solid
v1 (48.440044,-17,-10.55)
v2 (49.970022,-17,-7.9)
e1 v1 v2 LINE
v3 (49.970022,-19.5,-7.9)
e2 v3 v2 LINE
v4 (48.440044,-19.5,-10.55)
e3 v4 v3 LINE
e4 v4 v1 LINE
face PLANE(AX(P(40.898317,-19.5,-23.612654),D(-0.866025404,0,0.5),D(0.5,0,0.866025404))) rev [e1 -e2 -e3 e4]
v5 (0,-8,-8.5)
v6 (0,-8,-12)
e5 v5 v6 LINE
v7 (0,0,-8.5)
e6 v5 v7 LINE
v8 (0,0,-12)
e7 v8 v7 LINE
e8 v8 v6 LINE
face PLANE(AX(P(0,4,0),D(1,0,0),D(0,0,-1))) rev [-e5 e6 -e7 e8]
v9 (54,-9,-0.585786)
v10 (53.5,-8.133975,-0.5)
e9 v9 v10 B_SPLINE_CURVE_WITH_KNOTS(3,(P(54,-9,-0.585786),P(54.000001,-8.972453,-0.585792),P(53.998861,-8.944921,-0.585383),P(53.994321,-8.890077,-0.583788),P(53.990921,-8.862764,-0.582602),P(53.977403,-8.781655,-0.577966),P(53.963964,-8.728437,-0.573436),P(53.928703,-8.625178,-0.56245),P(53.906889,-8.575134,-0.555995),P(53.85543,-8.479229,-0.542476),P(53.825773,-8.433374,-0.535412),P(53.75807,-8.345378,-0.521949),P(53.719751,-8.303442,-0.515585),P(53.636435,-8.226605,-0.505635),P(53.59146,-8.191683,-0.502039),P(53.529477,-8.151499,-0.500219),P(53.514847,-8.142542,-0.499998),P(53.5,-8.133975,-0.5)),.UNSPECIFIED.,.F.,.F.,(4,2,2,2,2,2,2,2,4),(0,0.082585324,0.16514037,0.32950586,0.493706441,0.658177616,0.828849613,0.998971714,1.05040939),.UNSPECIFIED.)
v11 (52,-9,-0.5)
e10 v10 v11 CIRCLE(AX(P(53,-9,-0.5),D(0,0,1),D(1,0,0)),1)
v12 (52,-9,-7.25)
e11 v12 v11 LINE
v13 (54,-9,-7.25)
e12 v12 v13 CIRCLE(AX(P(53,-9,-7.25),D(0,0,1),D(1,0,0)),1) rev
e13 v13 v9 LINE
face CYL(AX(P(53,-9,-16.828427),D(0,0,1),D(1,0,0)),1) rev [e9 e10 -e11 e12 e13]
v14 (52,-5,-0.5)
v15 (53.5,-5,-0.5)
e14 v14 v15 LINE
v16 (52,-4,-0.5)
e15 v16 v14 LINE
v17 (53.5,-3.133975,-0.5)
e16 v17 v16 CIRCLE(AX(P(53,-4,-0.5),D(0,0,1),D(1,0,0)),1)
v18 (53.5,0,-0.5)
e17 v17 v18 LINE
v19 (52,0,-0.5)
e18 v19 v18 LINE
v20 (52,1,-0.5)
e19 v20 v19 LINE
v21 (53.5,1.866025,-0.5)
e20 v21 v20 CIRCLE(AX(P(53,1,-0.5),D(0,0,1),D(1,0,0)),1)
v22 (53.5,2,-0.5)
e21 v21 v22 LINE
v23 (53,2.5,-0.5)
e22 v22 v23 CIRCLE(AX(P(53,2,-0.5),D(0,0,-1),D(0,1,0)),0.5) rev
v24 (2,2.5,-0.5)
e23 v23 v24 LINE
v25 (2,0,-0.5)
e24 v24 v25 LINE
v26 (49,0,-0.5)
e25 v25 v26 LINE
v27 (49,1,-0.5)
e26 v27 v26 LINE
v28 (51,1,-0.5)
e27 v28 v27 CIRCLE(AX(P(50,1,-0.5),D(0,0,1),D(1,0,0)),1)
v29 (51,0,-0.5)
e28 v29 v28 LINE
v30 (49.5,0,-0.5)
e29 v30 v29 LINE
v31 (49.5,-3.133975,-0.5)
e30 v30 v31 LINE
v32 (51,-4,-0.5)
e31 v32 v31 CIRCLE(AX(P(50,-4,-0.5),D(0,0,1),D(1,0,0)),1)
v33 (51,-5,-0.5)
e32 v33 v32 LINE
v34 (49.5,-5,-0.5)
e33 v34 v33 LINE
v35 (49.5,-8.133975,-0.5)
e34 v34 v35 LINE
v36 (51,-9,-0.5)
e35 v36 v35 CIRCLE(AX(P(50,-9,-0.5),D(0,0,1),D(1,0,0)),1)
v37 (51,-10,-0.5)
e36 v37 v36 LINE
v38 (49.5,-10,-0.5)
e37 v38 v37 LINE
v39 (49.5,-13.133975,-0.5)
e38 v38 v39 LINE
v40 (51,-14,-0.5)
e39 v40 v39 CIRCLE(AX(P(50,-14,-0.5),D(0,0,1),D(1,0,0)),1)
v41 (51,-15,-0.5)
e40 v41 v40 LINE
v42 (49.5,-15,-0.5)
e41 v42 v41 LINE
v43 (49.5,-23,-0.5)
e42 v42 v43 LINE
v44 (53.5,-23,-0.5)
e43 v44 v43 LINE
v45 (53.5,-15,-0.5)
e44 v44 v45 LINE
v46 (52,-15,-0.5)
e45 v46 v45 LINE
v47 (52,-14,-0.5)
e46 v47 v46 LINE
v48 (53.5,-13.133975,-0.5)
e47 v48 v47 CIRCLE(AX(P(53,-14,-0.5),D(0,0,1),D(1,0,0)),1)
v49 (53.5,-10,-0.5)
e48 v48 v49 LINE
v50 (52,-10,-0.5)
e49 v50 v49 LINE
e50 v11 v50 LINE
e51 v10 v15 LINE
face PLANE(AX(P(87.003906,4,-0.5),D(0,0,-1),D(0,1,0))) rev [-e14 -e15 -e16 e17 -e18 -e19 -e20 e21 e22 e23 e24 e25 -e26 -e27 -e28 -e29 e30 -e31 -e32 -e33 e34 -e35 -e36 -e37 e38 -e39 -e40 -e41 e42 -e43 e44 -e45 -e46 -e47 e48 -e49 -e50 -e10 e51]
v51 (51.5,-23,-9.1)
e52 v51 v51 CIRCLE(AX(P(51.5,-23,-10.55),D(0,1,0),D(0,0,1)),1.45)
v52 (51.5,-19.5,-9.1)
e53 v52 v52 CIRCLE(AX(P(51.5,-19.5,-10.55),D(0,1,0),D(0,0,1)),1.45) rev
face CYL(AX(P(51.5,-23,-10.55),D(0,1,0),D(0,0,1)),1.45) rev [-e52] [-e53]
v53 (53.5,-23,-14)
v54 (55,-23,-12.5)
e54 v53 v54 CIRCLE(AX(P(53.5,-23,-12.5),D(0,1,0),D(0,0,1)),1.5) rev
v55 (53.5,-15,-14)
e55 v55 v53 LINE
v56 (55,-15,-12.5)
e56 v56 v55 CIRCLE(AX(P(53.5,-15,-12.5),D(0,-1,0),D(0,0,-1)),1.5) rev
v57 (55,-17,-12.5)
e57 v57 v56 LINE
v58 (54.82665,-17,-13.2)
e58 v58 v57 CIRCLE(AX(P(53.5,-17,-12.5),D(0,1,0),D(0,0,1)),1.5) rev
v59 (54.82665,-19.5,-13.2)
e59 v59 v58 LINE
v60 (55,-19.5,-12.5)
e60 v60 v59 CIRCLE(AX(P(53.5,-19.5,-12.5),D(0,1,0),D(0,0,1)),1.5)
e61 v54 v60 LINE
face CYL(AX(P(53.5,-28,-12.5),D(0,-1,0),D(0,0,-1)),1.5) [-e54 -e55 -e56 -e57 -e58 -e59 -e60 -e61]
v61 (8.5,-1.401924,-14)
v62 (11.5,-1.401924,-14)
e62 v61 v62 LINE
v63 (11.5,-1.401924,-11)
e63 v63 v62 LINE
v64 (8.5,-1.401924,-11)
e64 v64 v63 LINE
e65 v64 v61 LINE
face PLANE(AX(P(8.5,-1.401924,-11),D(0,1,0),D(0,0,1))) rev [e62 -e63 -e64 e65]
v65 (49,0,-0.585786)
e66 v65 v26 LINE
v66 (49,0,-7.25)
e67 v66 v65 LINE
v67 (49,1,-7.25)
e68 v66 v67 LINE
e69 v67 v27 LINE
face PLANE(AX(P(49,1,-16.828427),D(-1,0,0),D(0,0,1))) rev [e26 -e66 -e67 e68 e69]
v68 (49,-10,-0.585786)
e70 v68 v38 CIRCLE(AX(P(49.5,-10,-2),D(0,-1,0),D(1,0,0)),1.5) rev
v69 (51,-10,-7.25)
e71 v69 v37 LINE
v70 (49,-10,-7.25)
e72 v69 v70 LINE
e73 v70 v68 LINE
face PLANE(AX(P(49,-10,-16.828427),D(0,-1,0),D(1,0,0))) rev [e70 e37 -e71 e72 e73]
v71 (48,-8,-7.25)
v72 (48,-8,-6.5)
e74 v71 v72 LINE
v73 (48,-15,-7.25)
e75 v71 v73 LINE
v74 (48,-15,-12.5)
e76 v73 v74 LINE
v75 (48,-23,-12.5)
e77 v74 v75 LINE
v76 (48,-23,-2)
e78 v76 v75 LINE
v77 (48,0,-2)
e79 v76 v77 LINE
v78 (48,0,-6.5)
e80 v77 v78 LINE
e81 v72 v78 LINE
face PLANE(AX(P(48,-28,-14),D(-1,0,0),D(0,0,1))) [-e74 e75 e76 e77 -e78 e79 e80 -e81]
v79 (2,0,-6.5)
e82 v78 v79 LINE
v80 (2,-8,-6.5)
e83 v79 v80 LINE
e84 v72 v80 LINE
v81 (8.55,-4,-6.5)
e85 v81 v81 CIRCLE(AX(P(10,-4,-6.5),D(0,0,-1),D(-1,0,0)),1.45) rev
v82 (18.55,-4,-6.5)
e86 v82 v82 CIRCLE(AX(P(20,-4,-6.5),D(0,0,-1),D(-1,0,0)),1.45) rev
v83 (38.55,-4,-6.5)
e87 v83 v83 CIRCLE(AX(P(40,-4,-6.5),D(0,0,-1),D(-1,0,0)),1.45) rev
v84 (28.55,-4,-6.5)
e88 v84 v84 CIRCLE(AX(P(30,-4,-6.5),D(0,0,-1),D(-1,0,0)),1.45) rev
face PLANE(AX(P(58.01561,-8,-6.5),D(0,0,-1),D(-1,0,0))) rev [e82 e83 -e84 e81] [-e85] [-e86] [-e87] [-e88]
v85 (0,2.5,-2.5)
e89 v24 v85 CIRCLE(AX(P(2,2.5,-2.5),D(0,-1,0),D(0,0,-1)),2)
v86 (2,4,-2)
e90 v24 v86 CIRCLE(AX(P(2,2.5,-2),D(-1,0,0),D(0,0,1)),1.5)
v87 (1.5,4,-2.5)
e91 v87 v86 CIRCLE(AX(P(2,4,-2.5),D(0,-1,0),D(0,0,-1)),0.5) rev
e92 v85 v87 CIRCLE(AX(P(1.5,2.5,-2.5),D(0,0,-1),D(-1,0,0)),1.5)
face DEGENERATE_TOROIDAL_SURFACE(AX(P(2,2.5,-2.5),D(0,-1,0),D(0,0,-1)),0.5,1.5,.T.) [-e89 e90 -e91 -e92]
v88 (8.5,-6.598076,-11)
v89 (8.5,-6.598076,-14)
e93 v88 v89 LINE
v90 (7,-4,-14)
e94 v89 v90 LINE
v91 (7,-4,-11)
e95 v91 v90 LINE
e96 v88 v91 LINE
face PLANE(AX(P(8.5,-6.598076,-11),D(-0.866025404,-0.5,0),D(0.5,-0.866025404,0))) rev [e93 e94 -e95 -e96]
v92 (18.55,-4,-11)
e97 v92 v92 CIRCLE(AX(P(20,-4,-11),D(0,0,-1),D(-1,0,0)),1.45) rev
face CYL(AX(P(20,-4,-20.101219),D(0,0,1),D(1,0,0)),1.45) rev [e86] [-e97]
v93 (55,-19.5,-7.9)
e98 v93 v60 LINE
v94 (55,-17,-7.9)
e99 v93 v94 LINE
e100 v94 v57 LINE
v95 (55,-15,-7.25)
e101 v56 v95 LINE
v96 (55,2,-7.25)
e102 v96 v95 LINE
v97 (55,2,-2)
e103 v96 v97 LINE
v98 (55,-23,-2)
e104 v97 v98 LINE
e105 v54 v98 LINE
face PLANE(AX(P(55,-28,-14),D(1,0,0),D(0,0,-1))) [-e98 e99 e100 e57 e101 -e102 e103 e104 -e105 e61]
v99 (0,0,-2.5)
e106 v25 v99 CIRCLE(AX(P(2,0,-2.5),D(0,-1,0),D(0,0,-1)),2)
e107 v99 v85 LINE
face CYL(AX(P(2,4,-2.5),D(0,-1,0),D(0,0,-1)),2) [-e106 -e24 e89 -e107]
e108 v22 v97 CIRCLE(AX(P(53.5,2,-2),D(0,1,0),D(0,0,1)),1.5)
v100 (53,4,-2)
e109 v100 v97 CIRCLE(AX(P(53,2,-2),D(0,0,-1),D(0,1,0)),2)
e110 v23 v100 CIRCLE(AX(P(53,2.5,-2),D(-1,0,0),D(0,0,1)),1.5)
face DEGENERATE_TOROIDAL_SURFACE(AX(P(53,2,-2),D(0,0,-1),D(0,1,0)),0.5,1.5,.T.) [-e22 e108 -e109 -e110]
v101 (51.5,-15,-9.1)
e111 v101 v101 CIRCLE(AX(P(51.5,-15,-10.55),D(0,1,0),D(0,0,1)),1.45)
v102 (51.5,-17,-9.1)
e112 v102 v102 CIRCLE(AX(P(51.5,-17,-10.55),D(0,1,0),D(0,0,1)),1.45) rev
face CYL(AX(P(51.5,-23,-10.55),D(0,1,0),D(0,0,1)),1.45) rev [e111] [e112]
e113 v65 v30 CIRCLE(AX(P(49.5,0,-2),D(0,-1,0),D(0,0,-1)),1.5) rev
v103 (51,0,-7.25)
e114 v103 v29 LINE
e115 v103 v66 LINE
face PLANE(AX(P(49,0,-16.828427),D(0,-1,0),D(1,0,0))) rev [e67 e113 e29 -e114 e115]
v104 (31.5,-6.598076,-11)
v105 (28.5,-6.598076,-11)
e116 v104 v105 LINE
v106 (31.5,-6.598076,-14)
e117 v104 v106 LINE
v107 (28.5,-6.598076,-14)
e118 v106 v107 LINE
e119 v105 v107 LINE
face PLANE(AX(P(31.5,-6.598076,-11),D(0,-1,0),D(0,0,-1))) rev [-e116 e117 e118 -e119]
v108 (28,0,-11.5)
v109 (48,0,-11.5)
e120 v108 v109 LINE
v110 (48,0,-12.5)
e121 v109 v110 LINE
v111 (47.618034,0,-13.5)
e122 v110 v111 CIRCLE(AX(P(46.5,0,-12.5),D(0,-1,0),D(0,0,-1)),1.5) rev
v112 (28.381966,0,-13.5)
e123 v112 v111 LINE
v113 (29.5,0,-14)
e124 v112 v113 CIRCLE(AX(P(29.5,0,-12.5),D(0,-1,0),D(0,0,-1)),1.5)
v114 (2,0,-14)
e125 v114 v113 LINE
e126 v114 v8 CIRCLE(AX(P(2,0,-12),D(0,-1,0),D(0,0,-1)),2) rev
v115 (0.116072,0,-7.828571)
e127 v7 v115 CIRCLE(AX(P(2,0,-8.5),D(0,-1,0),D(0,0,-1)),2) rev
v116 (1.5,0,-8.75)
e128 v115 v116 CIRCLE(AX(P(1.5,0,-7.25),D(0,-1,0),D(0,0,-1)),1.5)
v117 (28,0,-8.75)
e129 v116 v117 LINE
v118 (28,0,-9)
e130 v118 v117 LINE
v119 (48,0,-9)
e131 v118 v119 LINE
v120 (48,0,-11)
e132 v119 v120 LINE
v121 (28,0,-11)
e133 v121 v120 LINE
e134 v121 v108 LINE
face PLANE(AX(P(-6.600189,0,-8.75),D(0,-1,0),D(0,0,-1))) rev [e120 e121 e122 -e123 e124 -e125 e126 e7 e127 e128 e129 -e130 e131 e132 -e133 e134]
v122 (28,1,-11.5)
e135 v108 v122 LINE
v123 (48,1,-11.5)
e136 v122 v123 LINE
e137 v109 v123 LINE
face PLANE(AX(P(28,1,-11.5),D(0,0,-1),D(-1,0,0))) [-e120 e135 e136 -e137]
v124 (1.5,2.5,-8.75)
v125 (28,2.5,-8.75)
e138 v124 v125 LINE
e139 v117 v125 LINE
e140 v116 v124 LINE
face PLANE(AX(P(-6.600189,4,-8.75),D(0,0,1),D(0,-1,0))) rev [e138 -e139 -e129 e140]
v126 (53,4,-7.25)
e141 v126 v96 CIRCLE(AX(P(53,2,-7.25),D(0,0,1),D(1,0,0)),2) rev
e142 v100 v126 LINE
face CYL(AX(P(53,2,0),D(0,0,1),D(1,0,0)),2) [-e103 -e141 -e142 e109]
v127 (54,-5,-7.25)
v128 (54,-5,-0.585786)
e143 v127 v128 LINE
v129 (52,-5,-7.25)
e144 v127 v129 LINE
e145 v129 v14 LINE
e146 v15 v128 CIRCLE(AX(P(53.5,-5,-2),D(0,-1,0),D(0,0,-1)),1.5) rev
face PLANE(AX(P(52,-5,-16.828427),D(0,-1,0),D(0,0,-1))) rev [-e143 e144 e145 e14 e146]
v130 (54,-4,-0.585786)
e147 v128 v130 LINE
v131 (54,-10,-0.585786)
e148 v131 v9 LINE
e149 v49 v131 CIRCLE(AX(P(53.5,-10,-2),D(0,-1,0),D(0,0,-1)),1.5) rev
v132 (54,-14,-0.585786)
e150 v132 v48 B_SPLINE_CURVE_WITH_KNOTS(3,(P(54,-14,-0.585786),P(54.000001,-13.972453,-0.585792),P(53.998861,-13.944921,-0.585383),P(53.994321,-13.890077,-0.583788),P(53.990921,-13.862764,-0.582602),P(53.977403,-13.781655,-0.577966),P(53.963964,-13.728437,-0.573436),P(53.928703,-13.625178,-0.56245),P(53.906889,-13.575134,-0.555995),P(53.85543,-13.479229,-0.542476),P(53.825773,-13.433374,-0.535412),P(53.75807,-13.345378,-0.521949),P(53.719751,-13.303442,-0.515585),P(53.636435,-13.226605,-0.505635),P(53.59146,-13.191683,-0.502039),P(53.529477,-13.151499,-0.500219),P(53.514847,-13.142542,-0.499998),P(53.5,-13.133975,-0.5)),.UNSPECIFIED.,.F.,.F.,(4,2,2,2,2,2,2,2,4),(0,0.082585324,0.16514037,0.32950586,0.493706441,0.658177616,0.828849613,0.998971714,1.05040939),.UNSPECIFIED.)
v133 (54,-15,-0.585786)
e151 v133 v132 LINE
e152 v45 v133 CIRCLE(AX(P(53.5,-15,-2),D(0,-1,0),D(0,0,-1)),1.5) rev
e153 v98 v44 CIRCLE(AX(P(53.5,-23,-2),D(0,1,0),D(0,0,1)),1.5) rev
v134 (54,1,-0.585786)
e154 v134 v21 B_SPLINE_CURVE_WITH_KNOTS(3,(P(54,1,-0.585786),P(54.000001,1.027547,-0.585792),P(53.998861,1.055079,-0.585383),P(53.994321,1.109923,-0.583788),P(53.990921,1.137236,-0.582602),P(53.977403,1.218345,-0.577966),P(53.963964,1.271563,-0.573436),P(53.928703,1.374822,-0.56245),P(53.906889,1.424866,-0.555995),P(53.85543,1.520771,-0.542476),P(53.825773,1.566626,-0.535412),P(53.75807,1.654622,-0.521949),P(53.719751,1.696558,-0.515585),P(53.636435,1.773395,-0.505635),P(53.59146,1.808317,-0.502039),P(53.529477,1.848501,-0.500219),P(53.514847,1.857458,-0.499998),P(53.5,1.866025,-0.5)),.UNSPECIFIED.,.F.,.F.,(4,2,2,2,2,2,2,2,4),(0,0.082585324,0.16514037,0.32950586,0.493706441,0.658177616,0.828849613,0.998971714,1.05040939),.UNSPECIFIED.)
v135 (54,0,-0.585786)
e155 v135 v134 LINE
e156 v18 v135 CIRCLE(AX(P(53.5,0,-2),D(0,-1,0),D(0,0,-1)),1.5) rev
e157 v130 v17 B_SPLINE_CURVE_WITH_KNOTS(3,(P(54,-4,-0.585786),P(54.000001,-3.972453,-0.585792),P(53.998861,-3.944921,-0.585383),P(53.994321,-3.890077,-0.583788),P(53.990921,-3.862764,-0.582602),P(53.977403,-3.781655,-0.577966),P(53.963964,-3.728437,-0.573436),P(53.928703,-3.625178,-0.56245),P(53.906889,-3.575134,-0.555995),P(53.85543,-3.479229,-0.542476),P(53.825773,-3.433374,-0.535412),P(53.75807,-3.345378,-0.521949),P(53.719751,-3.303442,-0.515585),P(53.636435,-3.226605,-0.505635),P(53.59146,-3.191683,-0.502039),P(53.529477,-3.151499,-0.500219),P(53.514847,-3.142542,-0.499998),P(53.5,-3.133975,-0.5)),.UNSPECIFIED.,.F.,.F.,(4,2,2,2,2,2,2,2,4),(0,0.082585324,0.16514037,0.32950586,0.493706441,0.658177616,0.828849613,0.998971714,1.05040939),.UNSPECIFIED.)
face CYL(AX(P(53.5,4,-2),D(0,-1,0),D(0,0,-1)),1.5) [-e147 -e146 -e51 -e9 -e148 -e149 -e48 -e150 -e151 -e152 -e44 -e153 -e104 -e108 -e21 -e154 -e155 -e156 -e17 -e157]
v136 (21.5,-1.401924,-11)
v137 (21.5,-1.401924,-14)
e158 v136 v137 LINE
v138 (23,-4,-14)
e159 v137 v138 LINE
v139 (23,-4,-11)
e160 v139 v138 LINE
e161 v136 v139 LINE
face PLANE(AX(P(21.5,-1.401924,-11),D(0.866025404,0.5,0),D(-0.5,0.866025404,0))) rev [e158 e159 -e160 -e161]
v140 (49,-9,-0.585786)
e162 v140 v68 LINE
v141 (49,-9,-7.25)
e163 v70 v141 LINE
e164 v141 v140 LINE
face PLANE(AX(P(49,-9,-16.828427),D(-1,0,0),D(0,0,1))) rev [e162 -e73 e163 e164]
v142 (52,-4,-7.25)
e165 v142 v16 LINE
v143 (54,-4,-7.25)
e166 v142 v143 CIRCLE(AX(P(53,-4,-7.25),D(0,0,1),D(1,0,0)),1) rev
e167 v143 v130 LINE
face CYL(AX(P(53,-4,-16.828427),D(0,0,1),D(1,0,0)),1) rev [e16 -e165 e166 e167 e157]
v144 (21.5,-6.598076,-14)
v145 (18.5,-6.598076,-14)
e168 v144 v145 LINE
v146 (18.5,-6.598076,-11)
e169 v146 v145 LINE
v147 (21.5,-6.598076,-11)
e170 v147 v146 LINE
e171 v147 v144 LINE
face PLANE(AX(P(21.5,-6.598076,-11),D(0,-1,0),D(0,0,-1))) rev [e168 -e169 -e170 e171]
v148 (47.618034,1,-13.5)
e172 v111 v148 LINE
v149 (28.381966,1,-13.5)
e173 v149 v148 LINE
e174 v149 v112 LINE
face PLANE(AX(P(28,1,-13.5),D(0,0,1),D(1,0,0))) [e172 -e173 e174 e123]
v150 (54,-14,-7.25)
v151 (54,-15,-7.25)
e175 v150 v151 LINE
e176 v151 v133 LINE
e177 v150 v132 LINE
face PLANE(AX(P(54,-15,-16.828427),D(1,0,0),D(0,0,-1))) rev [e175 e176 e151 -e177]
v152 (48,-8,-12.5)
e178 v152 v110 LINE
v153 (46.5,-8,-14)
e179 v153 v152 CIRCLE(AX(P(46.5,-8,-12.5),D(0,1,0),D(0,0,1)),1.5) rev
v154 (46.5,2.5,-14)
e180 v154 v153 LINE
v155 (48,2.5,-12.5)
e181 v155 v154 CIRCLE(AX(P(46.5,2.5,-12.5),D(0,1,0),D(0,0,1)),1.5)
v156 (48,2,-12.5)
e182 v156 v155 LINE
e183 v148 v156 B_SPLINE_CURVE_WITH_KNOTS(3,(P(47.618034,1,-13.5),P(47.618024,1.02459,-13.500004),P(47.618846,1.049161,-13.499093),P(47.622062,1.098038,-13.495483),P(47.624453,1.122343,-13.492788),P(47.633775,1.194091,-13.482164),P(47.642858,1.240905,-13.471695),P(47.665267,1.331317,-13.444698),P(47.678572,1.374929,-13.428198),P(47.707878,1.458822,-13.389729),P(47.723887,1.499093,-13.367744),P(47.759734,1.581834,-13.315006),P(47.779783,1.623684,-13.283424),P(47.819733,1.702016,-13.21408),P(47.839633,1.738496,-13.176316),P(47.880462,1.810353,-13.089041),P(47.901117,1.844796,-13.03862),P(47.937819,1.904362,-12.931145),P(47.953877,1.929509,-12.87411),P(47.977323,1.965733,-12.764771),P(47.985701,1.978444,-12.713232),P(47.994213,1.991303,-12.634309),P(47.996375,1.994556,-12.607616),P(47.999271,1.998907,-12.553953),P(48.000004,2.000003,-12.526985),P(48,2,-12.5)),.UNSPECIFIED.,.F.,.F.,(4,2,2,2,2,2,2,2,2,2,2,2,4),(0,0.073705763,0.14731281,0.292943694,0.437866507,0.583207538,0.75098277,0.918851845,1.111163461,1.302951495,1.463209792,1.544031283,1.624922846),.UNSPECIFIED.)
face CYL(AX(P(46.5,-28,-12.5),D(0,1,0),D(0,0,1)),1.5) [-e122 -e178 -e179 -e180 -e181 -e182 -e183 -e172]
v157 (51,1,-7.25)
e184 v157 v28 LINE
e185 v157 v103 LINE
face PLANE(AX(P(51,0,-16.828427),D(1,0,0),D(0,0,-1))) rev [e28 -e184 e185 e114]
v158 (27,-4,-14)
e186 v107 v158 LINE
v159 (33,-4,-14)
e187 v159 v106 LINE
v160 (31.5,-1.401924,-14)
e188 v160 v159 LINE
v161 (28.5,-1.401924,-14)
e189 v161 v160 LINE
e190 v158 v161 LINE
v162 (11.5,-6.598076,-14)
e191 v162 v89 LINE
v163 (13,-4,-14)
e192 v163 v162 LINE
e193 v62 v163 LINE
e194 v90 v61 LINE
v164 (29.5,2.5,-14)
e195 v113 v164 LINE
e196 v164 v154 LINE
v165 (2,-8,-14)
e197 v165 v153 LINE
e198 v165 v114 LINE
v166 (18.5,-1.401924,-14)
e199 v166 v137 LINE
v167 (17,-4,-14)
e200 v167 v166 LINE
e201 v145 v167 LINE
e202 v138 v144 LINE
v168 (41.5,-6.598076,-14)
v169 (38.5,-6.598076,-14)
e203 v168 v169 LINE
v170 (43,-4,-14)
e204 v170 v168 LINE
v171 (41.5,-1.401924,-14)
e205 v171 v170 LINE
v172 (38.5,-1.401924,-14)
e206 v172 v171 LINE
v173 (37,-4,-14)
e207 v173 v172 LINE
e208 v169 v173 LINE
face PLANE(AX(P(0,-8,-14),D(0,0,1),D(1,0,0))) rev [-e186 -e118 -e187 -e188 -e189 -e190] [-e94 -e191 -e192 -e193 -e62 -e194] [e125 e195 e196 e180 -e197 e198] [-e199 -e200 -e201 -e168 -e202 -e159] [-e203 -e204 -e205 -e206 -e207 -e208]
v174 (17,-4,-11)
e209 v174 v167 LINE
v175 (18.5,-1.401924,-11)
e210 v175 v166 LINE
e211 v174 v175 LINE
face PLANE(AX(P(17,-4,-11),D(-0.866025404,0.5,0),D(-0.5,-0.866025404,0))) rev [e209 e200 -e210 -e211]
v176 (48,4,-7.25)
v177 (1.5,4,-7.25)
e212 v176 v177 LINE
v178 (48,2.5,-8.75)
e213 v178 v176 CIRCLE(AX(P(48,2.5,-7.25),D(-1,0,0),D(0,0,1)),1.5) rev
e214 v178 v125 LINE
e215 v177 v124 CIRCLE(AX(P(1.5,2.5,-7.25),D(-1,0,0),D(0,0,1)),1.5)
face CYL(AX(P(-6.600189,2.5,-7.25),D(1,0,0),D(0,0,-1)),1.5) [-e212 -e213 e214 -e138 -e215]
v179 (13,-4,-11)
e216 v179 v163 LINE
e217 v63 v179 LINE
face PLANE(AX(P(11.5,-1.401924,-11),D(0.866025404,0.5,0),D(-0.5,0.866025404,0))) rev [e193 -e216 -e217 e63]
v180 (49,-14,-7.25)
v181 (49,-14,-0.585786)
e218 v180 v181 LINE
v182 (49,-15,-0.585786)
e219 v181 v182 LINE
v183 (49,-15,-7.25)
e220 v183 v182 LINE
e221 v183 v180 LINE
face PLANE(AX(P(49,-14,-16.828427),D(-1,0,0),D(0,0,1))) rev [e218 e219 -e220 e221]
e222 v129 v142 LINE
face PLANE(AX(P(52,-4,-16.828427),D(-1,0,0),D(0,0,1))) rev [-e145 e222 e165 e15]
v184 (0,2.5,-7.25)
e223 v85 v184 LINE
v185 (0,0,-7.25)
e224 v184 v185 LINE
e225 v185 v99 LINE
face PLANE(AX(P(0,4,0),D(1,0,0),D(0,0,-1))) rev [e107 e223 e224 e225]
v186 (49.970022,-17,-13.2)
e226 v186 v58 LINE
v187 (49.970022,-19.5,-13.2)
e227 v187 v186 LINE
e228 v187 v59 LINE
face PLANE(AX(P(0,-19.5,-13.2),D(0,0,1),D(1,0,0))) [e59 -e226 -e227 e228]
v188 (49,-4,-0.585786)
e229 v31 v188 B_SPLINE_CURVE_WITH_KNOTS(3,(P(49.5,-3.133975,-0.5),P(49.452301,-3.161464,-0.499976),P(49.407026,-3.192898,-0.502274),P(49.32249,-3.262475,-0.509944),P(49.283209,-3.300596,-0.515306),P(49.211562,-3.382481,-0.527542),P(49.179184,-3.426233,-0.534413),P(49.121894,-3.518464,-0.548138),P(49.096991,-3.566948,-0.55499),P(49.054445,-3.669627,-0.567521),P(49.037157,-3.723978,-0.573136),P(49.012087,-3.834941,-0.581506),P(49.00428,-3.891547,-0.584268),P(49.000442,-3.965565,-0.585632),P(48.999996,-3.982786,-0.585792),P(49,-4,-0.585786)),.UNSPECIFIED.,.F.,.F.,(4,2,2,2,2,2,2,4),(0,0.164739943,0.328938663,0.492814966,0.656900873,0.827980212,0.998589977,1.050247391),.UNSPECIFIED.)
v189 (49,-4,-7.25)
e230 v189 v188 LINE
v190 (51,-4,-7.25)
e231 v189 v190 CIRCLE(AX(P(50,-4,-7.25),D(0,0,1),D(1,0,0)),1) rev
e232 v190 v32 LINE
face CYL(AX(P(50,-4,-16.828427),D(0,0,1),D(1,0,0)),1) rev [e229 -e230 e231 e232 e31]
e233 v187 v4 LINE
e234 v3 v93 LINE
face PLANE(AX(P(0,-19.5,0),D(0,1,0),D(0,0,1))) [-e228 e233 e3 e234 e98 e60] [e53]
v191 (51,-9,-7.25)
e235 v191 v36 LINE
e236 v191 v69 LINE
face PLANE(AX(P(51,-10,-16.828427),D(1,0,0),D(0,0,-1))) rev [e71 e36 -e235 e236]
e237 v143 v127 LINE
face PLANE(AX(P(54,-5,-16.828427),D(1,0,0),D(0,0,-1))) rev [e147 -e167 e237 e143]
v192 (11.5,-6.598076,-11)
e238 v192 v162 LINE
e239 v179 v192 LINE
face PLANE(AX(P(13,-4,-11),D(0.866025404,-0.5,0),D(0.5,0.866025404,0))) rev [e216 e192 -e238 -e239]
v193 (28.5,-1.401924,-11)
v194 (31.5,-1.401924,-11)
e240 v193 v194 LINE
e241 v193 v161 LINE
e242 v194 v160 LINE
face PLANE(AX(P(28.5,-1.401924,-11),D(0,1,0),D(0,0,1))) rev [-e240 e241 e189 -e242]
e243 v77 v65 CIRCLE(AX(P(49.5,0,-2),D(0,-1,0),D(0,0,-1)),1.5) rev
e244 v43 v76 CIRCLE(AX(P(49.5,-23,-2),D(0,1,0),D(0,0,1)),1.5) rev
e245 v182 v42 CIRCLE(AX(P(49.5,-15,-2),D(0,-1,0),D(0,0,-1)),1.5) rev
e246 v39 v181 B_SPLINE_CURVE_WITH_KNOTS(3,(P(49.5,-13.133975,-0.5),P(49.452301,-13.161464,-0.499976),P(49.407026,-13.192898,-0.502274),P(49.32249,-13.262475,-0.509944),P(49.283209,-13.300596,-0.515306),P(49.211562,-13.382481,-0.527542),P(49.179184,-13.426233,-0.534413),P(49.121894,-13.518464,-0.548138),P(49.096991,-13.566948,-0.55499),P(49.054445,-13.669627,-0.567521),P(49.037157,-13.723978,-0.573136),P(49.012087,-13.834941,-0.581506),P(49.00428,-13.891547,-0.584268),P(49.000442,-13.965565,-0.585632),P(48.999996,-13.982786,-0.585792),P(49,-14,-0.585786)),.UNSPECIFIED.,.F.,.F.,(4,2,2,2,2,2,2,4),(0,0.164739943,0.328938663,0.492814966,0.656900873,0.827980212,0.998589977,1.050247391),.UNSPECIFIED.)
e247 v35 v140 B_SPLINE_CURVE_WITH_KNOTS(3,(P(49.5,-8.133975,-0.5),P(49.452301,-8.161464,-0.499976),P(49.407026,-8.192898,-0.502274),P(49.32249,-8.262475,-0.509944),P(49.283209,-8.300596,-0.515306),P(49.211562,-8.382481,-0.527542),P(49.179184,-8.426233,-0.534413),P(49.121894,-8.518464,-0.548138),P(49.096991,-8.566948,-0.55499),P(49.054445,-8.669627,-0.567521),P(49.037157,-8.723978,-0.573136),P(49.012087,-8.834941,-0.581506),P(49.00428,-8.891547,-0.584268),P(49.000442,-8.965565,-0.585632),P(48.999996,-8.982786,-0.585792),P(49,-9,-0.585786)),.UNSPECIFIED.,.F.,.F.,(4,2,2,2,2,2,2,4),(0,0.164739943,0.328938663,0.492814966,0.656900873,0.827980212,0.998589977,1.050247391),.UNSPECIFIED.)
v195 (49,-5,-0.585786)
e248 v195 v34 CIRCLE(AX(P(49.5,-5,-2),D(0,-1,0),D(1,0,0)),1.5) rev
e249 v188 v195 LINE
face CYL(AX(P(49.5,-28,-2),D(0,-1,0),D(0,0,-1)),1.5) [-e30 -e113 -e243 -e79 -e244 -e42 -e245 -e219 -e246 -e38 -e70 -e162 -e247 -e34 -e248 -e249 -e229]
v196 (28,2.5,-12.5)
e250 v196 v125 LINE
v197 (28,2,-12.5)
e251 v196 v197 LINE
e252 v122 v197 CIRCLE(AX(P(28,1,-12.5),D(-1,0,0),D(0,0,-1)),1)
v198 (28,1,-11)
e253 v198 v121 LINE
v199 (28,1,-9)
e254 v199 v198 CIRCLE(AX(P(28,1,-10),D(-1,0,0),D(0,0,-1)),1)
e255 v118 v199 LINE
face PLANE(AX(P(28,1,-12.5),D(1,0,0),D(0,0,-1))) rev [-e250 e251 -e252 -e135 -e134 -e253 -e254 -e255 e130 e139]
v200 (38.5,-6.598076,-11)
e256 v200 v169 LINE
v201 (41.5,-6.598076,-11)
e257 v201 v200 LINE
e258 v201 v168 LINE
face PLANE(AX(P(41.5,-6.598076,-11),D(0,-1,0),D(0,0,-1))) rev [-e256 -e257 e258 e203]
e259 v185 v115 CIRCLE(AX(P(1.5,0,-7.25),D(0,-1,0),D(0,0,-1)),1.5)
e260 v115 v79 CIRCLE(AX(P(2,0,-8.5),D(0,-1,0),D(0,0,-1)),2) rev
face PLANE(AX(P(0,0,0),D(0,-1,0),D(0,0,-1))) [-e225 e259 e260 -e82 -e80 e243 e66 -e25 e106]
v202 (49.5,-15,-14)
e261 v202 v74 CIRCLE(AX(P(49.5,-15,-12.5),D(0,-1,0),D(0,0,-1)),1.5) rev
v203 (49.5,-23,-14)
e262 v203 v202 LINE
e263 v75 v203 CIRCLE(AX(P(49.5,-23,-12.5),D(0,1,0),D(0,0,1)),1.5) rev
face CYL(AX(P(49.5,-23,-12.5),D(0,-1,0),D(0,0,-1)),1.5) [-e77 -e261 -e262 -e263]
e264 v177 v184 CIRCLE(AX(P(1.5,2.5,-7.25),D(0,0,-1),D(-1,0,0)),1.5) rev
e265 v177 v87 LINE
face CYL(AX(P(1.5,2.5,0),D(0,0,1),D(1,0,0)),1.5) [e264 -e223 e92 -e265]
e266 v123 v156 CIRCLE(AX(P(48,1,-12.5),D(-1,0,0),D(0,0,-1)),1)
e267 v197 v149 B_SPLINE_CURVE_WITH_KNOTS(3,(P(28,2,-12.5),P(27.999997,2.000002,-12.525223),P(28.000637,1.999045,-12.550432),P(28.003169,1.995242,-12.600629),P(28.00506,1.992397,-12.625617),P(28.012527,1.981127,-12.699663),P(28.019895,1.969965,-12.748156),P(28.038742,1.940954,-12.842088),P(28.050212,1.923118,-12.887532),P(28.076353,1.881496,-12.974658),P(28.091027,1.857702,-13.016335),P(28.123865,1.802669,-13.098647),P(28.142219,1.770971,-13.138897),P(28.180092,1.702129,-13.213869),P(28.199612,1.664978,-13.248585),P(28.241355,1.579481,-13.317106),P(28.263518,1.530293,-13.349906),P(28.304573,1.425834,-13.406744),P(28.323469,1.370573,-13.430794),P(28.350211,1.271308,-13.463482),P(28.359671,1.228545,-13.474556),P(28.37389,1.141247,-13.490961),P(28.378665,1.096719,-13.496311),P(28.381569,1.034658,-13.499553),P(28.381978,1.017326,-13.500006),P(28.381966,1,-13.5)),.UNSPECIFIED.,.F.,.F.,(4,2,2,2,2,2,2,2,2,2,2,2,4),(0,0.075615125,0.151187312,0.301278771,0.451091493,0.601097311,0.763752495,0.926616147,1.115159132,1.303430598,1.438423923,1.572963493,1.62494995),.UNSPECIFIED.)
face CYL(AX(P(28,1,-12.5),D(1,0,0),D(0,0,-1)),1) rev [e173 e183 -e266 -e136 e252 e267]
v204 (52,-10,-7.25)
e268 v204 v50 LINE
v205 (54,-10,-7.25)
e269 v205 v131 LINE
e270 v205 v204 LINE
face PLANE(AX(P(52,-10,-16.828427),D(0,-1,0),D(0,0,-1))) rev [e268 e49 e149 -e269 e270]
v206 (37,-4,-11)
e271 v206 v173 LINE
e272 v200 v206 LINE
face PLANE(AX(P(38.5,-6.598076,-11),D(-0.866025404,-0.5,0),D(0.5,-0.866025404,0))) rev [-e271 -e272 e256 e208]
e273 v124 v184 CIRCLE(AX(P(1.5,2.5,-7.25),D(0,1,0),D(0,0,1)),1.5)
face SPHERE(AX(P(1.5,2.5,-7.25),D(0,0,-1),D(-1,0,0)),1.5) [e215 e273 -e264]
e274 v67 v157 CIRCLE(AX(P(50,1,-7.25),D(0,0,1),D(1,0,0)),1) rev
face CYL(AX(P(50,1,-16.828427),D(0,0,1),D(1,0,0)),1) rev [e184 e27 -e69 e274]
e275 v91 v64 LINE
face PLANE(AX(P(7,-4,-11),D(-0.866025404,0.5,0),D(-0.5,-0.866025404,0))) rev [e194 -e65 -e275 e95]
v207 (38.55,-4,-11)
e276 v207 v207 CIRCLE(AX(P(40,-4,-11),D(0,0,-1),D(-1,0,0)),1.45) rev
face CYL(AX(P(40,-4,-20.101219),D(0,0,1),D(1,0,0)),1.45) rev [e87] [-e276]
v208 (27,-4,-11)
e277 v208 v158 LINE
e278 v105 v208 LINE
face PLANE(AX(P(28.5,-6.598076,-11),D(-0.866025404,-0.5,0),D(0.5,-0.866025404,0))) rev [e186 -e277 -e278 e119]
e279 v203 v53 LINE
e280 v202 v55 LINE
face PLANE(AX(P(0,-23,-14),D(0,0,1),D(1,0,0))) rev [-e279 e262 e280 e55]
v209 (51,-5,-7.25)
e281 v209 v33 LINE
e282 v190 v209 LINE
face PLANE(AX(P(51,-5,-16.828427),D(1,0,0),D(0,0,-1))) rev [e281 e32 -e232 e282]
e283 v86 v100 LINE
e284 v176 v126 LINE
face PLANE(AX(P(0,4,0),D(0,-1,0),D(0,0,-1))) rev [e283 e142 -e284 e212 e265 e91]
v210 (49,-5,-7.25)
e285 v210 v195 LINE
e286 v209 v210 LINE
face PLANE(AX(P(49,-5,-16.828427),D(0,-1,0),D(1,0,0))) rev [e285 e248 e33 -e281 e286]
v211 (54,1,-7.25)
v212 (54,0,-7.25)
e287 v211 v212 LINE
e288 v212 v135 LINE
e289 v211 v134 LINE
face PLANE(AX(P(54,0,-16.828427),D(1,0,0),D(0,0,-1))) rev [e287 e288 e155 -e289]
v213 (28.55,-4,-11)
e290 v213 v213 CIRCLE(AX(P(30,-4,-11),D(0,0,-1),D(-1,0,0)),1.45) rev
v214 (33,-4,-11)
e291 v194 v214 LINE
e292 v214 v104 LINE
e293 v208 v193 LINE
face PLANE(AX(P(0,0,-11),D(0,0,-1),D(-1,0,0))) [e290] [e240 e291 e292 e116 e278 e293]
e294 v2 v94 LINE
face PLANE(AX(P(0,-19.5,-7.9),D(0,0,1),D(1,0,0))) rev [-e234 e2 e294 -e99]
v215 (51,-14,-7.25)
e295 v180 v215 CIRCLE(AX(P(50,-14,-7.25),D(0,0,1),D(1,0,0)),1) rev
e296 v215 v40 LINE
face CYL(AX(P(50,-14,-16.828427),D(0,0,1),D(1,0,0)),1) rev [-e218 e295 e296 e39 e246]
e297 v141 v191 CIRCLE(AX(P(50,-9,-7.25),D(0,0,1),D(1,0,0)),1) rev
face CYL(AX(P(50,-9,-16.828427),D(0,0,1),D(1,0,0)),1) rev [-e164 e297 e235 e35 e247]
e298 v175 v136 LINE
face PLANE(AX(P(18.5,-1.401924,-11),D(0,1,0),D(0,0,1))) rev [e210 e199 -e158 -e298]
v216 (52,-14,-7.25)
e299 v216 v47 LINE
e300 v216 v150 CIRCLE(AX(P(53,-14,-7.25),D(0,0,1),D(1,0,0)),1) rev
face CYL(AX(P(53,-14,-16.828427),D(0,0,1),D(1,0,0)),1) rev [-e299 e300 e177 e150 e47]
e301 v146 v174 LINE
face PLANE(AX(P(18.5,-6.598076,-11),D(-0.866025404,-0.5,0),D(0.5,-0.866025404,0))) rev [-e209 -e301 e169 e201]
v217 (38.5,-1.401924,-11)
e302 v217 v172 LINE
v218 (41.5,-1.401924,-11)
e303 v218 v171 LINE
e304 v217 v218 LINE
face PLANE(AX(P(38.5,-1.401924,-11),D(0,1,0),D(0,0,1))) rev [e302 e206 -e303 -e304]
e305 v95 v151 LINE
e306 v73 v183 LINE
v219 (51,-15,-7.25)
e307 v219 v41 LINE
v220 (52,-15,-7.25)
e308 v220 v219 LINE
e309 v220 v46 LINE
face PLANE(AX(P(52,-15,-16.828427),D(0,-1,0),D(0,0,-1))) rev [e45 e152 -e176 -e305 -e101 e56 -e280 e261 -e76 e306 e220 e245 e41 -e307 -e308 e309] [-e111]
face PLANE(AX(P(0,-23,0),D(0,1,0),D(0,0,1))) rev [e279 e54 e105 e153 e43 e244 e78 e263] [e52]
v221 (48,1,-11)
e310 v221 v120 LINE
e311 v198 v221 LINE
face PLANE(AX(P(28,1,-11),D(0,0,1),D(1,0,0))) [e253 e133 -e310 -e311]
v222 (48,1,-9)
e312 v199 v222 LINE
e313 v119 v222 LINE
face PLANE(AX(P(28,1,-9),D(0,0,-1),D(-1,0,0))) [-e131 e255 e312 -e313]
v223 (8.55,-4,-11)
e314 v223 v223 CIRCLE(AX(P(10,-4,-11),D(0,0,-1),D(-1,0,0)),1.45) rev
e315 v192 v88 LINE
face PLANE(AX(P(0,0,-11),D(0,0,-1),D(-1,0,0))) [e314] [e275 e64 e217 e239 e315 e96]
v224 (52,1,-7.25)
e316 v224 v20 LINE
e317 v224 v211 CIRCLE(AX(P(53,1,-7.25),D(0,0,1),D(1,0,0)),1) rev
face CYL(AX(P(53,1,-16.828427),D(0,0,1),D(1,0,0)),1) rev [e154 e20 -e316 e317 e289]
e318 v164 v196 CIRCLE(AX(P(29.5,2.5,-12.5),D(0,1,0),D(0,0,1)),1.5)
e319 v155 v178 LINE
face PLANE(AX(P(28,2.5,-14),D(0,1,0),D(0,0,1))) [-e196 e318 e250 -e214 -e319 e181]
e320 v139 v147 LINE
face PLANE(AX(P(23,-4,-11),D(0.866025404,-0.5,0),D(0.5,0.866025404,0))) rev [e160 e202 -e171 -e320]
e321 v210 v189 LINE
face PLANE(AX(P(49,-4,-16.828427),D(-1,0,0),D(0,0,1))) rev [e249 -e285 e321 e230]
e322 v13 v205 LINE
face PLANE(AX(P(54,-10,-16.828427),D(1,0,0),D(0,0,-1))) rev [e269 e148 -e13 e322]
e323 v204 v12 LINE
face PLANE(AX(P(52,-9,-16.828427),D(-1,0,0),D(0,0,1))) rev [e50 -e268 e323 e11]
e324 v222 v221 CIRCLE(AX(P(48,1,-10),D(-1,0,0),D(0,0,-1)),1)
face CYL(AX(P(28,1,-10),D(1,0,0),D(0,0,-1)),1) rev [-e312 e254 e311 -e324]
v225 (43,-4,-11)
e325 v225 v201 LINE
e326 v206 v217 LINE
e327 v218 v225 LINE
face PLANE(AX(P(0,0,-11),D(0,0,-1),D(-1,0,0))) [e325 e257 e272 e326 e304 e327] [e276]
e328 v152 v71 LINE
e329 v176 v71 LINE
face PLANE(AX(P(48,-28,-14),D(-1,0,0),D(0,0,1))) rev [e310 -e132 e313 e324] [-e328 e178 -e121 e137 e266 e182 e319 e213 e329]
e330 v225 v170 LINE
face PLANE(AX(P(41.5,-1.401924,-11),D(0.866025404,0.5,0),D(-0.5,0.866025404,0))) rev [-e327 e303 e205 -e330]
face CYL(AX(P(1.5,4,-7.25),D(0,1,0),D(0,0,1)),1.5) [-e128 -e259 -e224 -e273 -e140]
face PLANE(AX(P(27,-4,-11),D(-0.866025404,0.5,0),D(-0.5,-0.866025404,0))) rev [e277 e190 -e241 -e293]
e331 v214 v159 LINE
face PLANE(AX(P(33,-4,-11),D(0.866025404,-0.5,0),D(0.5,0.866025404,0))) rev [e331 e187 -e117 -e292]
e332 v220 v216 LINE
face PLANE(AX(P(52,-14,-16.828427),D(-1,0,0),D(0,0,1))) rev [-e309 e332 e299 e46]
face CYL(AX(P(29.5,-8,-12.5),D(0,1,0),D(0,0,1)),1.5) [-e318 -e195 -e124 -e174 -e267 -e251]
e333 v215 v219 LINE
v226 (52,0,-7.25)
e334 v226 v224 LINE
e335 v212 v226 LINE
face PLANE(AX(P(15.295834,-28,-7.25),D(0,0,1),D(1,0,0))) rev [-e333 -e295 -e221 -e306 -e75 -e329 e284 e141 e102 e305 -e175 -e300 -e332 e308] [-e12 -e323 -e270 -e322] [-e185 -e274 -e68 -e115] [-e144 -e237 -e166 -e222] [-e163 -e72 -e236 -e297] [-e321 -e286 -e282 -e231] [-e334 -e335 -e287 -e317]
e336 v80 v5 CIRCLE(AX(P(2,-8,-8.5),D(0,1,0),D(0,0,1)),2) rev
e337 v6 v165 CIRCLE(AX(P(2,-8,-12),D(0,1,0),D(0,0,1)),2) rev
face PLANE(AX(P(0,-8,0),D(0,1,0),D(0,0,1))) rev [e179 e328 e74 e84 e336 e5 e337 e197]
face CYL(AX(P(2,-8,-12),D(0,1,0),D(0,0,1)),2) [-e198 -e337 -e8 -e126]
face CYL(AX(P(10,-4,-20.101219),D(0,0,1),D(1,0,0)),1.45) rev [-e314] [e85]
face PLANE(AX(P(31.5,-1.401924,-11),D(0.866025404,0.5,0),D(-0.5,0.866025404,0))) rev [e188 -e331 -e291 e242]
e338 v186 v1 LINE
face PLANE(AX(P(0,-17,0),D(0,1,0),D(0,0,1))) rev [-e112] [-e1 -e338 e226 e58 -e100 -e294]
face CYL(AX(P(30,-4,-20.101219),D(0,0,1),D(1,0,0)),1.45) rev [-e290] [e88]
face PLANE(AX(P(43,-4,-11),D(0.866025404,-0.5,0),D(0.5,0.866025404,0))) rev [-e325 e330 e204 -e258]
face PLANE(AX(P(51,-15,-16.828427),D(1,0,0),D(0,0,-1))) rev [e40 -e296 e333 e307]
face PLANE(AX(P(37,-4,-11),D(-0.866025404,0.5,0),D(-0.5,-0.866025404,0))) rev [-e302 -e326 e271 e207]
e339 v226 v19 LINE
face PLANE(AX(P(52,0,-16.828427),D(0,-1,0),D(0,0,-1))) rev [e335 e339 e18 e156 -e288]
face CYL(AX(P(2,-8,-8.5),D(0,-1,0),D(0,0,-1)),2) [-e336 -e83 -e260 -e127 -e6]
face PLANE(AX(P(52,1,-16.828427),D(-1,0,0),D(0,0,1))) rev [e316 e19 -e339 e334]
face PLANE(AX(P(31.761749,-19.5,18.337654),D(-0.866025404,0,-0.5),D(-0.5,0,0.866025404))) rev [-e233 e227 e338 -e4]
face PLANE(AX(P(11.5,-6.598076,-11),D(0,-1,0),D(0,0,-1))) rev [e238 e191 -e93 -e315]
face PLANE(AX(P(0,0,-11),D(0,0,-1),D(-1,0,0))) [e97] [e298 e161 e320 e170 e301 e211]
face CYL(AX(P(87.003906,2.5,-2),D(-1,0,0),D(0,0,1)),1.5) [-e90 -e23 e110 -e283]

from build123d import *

# Parameters (mm, degrees)
SKETCH1_W            = 55
SKETCH1_H            = 16
BOSS_EXTRUDE1_DEPTH  = 4
SKETCH2_W            = 50
SKETCH2_H            = 8
BOSS_EXTRUDE2_DEPTH  = 8
SKETCH3_W            = 5
SKETCH3_H            = 16
BOSS_EXTRUDE3_DEPTH  = 28
SKETCH4_R            = 1.45
CUT_EXTRUDE2_DEPTH   = 10
CUT_EXTRUDE4_START   = -3
CUT_EXTRUDE4_DEPTH   = 3
CUT_EXTRUDE5_DEPTH   = 5
SKETCH8_W            = 50
SKETCH8_H            = 2
CUT_EXTRUDE6_DEPTH   = 4
CUT_EXTRUDE7_START   = -50
SKETCH9_W            = 0.5
SKETCH9_H            = 8
CUT_EXTRUDE7_DEPTH   = 50
CUT_EXTRUDE8_START   = -55
SKETCH10_W           = 0.5
SKETCH10_H           = 32
CUT_EXTRUDE8_DEPTH   = 55
CUT_EXTRUDE9_DEPTH   = 3
CUT_EXTRUDE11_DEPTH  = 3
BOSS_EXTRUDE4_START  = 2
SKETCH17_W           = 15
SKETCH17_H           = 32
BOSS_EXTRUDE4_DEPTH  = 2
SKETCH18_W           = 7
SKETCH18_H           = 1.5
CUT_EXTRUDE12_DEPTH  = 32
FILLET1_R            = 2
SKETCH19_W           = 13.5
SKETCH19_H           = 32
CUT_EXTRUDE13_DEPTH  = 7
SKETCH20_W           = 7
SKETCH20_H           = 13.5
BOSS_EXTRUDE5_DEPTH  = 32
CUT_EXTRUDE14_DEPTH  = 13.5
FILLET2_R            = 2
CUT_EXTRUDE15_REACH  = 65.285
SKETCH22_W           = 6.75
SKETCH22_H           = 32
LPATTERN1_COUNT      = 4
LPATTERN1_PITCH      = 5
SKETCH23_W           = 5.25
SKETCH23_H           = 4
CUT_EXTRUDE16_DEPTH  = 48
BOSS_EXTRUDE9_START  = -15
SKETCH29_W           = 7
SKETCH29_H           = 6.75
SKETCH29_R           = 1.45
BOSS_EXTRUDE9_DEPTH  = 8
CUT_EXTRUDE19_START  = -2
CUT_EXTRUDE19_DEPTH  = 2.5
BOSS_EXTRUDE11_DEPTH = 20
SKETCH35_W           = 7
SKETCH35_H           = 5
CUT_EXTRUDE20_DEPTH  = 6.75
FILLET3_R            = 1.5


# Read off the part's stored shape, not the designer's step: Cut-Extrude4
with BuildPart() as part:
    # Sketch1 → Boss-Extrude1 (new body)
    with BuildSketch(Plane(origin=(0, 0, 0), x_dir=(1, 0, 0), z_dir=(0, 1, 0))):
        with Locations((27.5, 8)):
            Rectangle(SKETCH1_W, SKETCH1_H)
    extrude(amount=BOSS_EXTRUDE1_DEPTH)

    # Sketch2 → Boss-Extrude2 (add)
    with BuildSketch(Plane.XZ):
        with Locations((25, -10)):
            Rectangle(SKETCH2_W, SKETCH2_H)
    extrude(amount=BOSS_EXTRUDE2_DEPTH)

    # Sketch3 → Boss-Extrude3 (add)
    with BuildSketch(Plane.XZ):
        with Locations((52.5, -8)):
            Rectangle(SKETCH3_W, SKETCH3_H)
    extrude(amount=BOSS_EXTRUDE3_DEPTH)

    # Sketch4 → Cut-Extrude2 (cut)
    with BuildSketch(Plane.XY.offset(-6)):
        with Locations((10, -4)):
            Circle(SKETCH4_R)
        with Locations((20, -4)):
            Circle(SKETCH4_R)
        with Locations((30, -4)):
            Circle(SKETCH4_R)
        with Locations((40, -4)):
            Circle(SKETCH4_R)
    extrude(amount=-CUT_EXTRUDE2_DEPTH, mode=Mode.SUBTRACT)

    # Cut-Extrude4 outline → Cut-Extrude4 (cut)
    with BuildSketch(Plane.ZY.offset(-50).offset(CUT_EXTRUDE4_START)):
        Polygon((-6.598076211, -25.5), (-4, -27), (-1.401923789, -25.5), (-1.401923789, 0), (-6, 0), (-6, -8), (-6.598076211, -8), align=None)
        Polygon((-7.401923789, -25.5), (-7.401923789, -8), (-12.598076211, -8), (-12.598076211, -25.5), (-10, -27), align=None)
    extrude(amount=CUT_EXTRUDE4_DEPTH, mode=Mode.SUBTRACT)

    # Sketch7 → Cut-Extrude5 (cut)
    with BuildSketch(Plane.ZY.offset(-50)):
        with BuildLine():
            Line((-11.45, -12), (-11.45, -24))
            ThreePointArc((-11.45, -24), (-10, -25.45), (-8.55, -24))
            Line((-8.55, -24), (-8.55, -12))
            ThreePointArc((-8.55, -12), (-10, -10.55), (-11.45, -12))
        make_face()
        with BuildLine():
            Line((-2.55, -12), (-2.55, -24))
            ThreePointArc((-2.55, -24), (-4, -25.45), (-5.45, -24))
            Line((-5.45, -24), (-5.45, -12))
            ThreePointArc((-5.45, -12), (-4, -10.55), (-2.55, -12))
        make_face()
    extrude(amount=-CUT_EXTRUDE5_DEPTH, mode=Mode.SUBTRACT)

    # Sketch8 → Cut-Extrude6 (cut)
    with BuildSketch(Plane(origin=(0, 4, 0), x_dir=(1, 0, 0), z_dir=(0, 1, 0))):
        with Locations((25, 15)):
            Rectangle(SKETCH8_W, SKETCH8_H)
    extrude(amount=-CUT_EXTRUDE6_DEPTH, mode=Mode.SUBTRACT)

    # Sketch9 → Cut-Extrude7 (cut)
    with BuildSketch(Plane.ZY.offset(CUT_EXTRUDE7_START)):
        with Locations((-6.25, -4)):
            Rectangle(SKETCH9_W, SKETCH9_H)
    extrude(amount=CUT_EXTRUDE7_DEPTH, mode=Mode.SUBTRACT)

    # Sketch10 → Cut-Extrude8 (cut)
    with BuildSketch(Plane.ZY.offset(CUT_EXTRUDE8_START)):
        with Locations((-0.25, -12)):
            Rectangle(SKETCH10_W, SKETCH10_H)
        with Locations((-15.75, -12)):
            Rectangle(SKETCH10_W, SKETCH10_H)
    extrude(amount=CUT_EXTRUDE8_DEPTH, mode=Mode.SUBTRACT)

    # Sketch11 → Cut-Extrude9 (cut)
    with BuildSketch(Plane(origin=(0, 0, -14), x_dir=(-1, 0, 0), z_dir=(0, 0, -1))):
        Polygon((-37, -4), (-38.5, -1.401923789), (-41.5, -1.401923789), (-43, -4), (-41.5, -6.598076211), (-38.5, -6.598076211), align=None)
        Polygon((-27, -4), (-28.5, -1.401923789), (-31.5, -1.401923789), (-33, -4), (-31.5, -6.598076211), (-28.5, -6.598076211), align=None)
        Polygon((-17, -4), (-18.5, -1.401923789), (-21.5, -1.401923789), (-23, -4), (-21.5, -6.598076211), (-18.5, -6.598076211), align=None)
        Polygon((-7, -4), (-8.5, -1.401923789), (-11.5, -1.401923789), (-13, -4), (-11.5, -6.598076211), (-8.5, -6.598076211), align=None)
    extrude(amount=-CUT_EXTRUDE9_DEPTH, mode=Mode.SUBTRACT)

    # Sketch15 → Cut-Extrude11 (cut)
    with BuildSketch(Plane.ZY.offset(-50)):
        Polygon((-4, -27), (-1.401923789, -25.5), (-1.401923789, 0.004821093), (-1.401923789, 4), (-6.598076211, 4), (-6.598076211, -8), (-6.598076211, -25.5), align=None)
        Polygon((-7.401923789, -25.5), (-7.401923789, -8), (-7.401923789, 4), (-12.598076211, 4), (-12.598076211, -8), (-12.598076211, -25.5), (-10, -27), align=None)
    extrude(amount=-CUT_EXTRUDE11_DEPTH, mode=Mode.SUBTRACT)

    # Sketch17 → Boss-Extrude4 (add)
    with BuildSketch(Plane.ZY.offset(-50).offset(BOSS_EXTRUDE4_START)):
        with Locations((-8, -12)):
            Rectangle(SKETCH17_W, SKETCH17_H)
        with BuildLine():
            Line((-11.45, -12), (-11.45, -24))
            ThreePointArc((-11.45, -24), (-10, -25.45), (-8.55, -24))
            Line((-8.55, -24), (-8.55, -12))
            ThreePointArc((-8.55, -12), (-10, -10.55), (-11.45, -12))
        make_face(mode=Mode.SUBTRACT)
        with BuildLine():
            Line((-5.45, -12), (-5.45, -24))
            ThreePointArc((-5.45, -24), (-4, -25.45), (-2.55, -24))
            Line((-2.55, -24), (-2.55, -12))
            ThreePointArc((-2.55, -12), (-4, -10.55), (-5.45, -12))
        make_face(mode=Mode.SUBTRACT)
    extrude(amount=-BOSS_EXTRUDE4_DEPTH)

    # Sketch18 → Cut-Extrude12 (cut)
    with BuildSketch(Plane(origin=(0, 4, 0), x_dir=(1, 0, 0), z_dir=(0, 1, 0))):
        with Locations((51.5, 14.75)):
            Rectangle(SKETCH18_W, SKETCH18_H)
    extrude(amount=-CUT_EXTRUDE12_DEPTH, mode=Mode.SUBTRACT)

    # Fillet1
    fillet1_edges = [part.edges().sort_by_distance(p)[0] for p in [
        (0, -2, -14),
        (0, -4, -6.5),
        (0, 2, -0.5),
        (55, -12, -0.5),
        (48, -14, -0.5),
        (55, -12, -14),
        (48, -18, -14),
    ]]
    fillet(fillet1_edges, radius=FILLET1_R)

    # Sketch19 → Cut-Extrude13 (cut)
    with BuildSketch(Plane(origin=(55, 0, 0), x_dir=(0, 0, -1), z_dir=(1, 0, 0))):
        with Locations((7.25, -12)):
            Rectangle(SKETCH19_W, SKETCH19_H)
    extrude(amount=-CUT_EXTRUDE13_DEPTH, mode=Mode.SUBTRACT)

    # Sketch20 → Boss-Extrude5 (add)
    with BuildSketch(Plane(origin=(0, 4, 0), x_dir=(1, 0, 0), z_dir=(0, 1, 0))):
        with Locations((51.5, 7.25)):
            Rectangle(SKETCH20_W, SKETCH20_H)
    extrude(amount=-BOSS_EXTRUDE5_DEPTH)

    # Sketch21 → Cut-Extrude14 (cut)
    with BuildSketch(Plane.XY.offset(-0.5)):
        with BuildLine():
            Line((52, 1), (52, 0))
            Line((52, 0), (54, 0))
            Line((54, 0), (54, 1))
            ThreePointArc((54, 1), (53.707106781, 1.707106781), (53, 2))
            ThreePointArc((53, 2), (52.292893219, 1.707106781), (52, 1))
        make_face()
        with BuildLine():
            Line((49, 1), (49, 0))
            Line((49, 0), (51, 0))
            Line((51, 0), (51, 1))
            ThreePointArc((51, 1), (50, 2), (49, 1))
        make_face()
    cut_extrude14 = extrude(amount=-CUT_EXTRUDE14_DEPTH, mode=Mode.SUBTRACT)

    # Fillet2
    fillet2_edges = [part.edges().sort_by_distance(p)[0] for p in [
        (48, -28, -7.25),
        (55, -28, -7.25),
        (55, 4, -7.25),
    ]]
    fillet(fillet2_edges, radius=FILLET2_R)

    # Cut-Extrude15: up to this face of the body (flat: up to its plane)
    cut_extrude15_end = Plane(part.part.faces().sort_by_distance((48, -14.855670103, -6.631443299))[0])
    # Sketch22 → Cut-Extrude15 (cut, up to the picked face)
    with BuildSketch(Plane(origin=(55, 0, 0), x_dir=(0, 0, -1), z_dir=(1, 0, 0)), mode=Mode.PRIVATE) as cut_extrude15_sk1:
        with Locations((10.625, -12)):
            Rectangle(SKETCH22_W, SKETCH22_H)
    cut_extrude15_tool1 = split(extrude(cut_extrude15_sk1.sketch, amount=-CUT_EXTRUDE15_REACH, mode=Mode.PRIVATE), bisect_by=cut_extrude15_end, keep=Keep.BOTH, mode=Mode.PRIVATE)
    add(cut_extrude15_tool1.solids().sort_by(Axis((55, -12, -10.625), (-1, 0, 0)))[0], mode=Mode.SUBTRACT)

    # LPattern1: Cut-Extrude14 ×4
    with Locations(*[(0, -i * LPATTERN1_PITCH, 0) for i in range(1, LPATTERN1_COUNT)]):
        add(cut_extrude14, mode=Mode.SUBTRACT)

    # Sketch23 → Cut-Extrude16 (cut)
    with BuildSketch(Plane(origin=(48, 0, 0), x_dir=(0, 0, -1), z_dir=(1, 0, 0))):
        with Locations((11.375, 2)):
            Rectangle(SKETCH23_W, SKETCH23_H)
    extrude(amount=-CUT_EXTRUDE16_DEPTH, mode=Mode.SUBTRACT)

    # Sketch29 → Boss-Extrude9 (add)
    with BuildSketch(Plane(origin=(0, 0, 0), x_dir=(1, 0, 0), z_dir=(0, 1, 0)).offset(BOSS_EXTRUDE9_START)):
        with Locations((51.5, 10.625)):
            Rectangle(SKETCH29_W, SKETCH29_H)
        with Locations(Location((51.5, 10.55, 0), (0, 0, 270))):
            Circle(SKETCH29_R, mode=Mode.SUBTRACT)
    extrude(amount=-BOSS_EXTRUDE9_DEPTH)

    # Sketch30 → Cut-Extrude19 (cut)
    with BuildSketch(Plane(origin=(0, -15, 0), x_dir=(1, 0, 0), z_dir=(0, 1, 0)).offset(CUT_EXTRUDE19_START)):
        Polygon((53.029978213, 13.2), (49.970021787, 13.2), (48.440043573, 10.55), (49.970021787, 7.9), (53.029978213, 7.9), (55, 7.9), (55, 13.2), align=None)
    extrude(amount=-CUT_EXTRUDE19_DEPTH, mode=Mode.SUBTRACT)

    # Sketch34 → Boss-Extrude11 (add)
    with BuildSketch(Plane(origin=(48, 0, 0), x_dir=(0, 0, -1), z_dir=(1, 0, 0))):
        with BuildLine():
            Line((14, 2.5), (7.25, 2.5))
            Line((7.25, 2.5), (7.25, 0))
            Line((7.25, 0), (9, 0))
            Line((9, 0), (9, 1))
            ThreePointArc((9, 1), (10, 2), (11, 1))
            Line((11, 1), (11, 0))
            Line((11, 0), (11.5, 0))
            Line((11.5, 0), (11.5, 1))
            ThreePointArc((11.5, 1), (12.5, 2), (13.5, 1))
            Line((13.5, 1), (13.5, 0))
            Line((13.5, 0), (14, 0))
            Line((14, 0), (14, 2.5))
        make_face()
    extrude(amount=-BOSS_EXTRUDE11_DEPTH)

    # Sketch35 → Cut-Extrude20 (cut)
    with BuildSketch(Plane.XY.offset(-0.5)):
        with Locations((51.5, -25.5)):
            Rectangle(SKETCH35_W, SKETCH35_H)
    extrude(amount=-CUT_EXTRUDE20_DEPTH, mode=Mode.SUBTRACT)

    # Fillet3
    # the kernel refuses this fillet: 1.5 mm, written as the material it takes off along each edge
    with BuildSketch(Plane(origin=(1.5, 2.5, -7.25), x_dir=(0, 0, -1), z_dir=(0, 1, 0))) as fillet3_piece_1_section:
        Polygon((0, 0), (FILLET3_R, 0), (FILLET3_R, FILLET3_R), (0, FILLET3_R), align=None)
    fillet3_piece_1 = extrude(amount=FILLET3_R, mode=Mode.PRIVATE)
    fillet3_piece_1 = fillet3_piece_1 - Plane(origin=(1.5, 2.5, -7.25), x_dir=(0.7071067811865475, 0, 0.7071067811865475), z_dir=(0, 1, 0)) * Sphere(FILLET3_R, mode=Mode.PRIVATE)
    add(fillet3_piece_1, mode=Mode.SUBTRACT)
    with BuildSketch(Plane(origin=(0, 4, -7.25), x_dir=(1, 0, 0), z_dir=(0, 0, 1))) as fillet3_piece_2:
        with BuildLine():
            CenterArc((FILLET3_R, -FILLET3_R), FILLET3_R, 90, 90)
            Line((0, -FILLET3_R), (0, 0))
            Line((0, 0), (FILLET3_R, 0))
        make_face()
    extrude(amount=4.75, mode=Mode.SUBTRACT)
    with BuildSketch(Plane(origin=(2, 4, -2.5), x_dir=(-1, 0, 0), z_dir=(0, 0, -1))) as fillet3_piece_3:
        with BuildLine():
            CenterArc((2 - FILLET3_R, -FILLET3_R), FILLET3_R, 0, 90)
            Line((2, -FILLET3_R), (2, 0))
            Line((2, 0), (2 - FILLET3_R, 0))
        make_face()
    revolve(axis=Axis((2, 4, -2.5), (0, 1, 0)), revolution_arc=90, mode=Mode.SUBTRACT)
    with BuildSketch(Plane(origin=(2, 4, -0.5), x_dir=(0, 0, -1), z_dir=(1, 0, 0))) as fillet3_piece_4:
        with BuildLine():
            CenterArc((FILLET3_R, -FILLET3_R), FILLET3_R, 90, 90)
            Line((0, -FILLET3_R), (0, 0))
            Line((0, 0), (FILLET3_R, 0))
        make_face()
    extrude(amount=51, mode=Mode.SUBTRACT)
    with BuildSketch(Plane(origin=(53, 2, -0.5), x_dir=(0, 1, 0), z_dir=(-1, 0, 0))) as fillet3_piece_5:
        with BuildLine():
            CenterArc((2 - FILLET3_R, FILLET3_R), FILLET3_R, 270, 90)
            Line((2 - FILLET3_R, 0), (2, 0))
            Line((2, 0), (2, FILLET3_R))
        make_face()
    revolve(axis=Axis((53, 2, -0.5), (0, 0, -1)), revolution_arc=90, mode=Mode.SUBTRACT)
    with BuildSketch(Plane(origin=(48, -11.25, -14), x_dir=(0, 0, 1), z_dir=(0, -1, 0))) as fillet3_piece_6:
        with BuildLine():
            CenterArc((FILLET3_R, -FILLET3_R), FILLET3_R, 90, 90)
            Line((0, -FILLET3_R), (0, 0))
            Line((0, 0), (FILLET3_R, 0))
        make_face()
    extrude(amount=15.5, mode=Mode.SUBTRACT)
    with BuildSketch(Plane(origin=(55, -11.25, -14), x_dir=(0, 0, 1), z_dir=(0, -1, 0))) as fillet3_piece_7:
        with BuildLine():
            CenterArc((FILLET3_R, FILLET3_R), FILLET3_R, 180, 90)
            Line((0, FILLET3_R), (0, 0))
            Line((0, 0), (FILLET3_R, 0))
        make_face()
    extrude(amount=15.5, mode=Mode.SUBTRACT)
    with BuildSketch(Plane(origin=(55, 2, -0.5), x_dir=(0, 0, -1), z_dir=(0, -1, 0))) as fillet3_piece_8:
        with BuildLine():
            CenterArc((FILLET3_R, -FILLET3_R), FILLET3_R, 90, 90)
            Line((0, -FILLET3_R), (0, 0))
            Line((0, 0), (FILLET3_R, 0))
        make_face()
    extrude(amount=28.75, mode=Mode.SUBTRACT)
    with BuildSketch(Plane(origin=(51.75, 4, -8.75), x_dir=(0, 0, 1), z_dir=(-1, 0, 0))) as fillet3_piece_9:
        with BuildLine():
            CenterArc((FILLET3_R, -FILLET3_R), FILLET3_R, 90, 90)
            Line((0, -FILLET3_R), (0, 0))
            Line((0, 0), (FILLET3_R, 0))
        make_face()
    extrude(amount=50.25, mode=Mode.SUBTRACT)
    with BuildSketch(Plane(origin=(0, 0, -8.75), x_dir=(1, 0, 0), z_dir=(0, 1, 0))) as fillet3_piece_10:
        with BuildLine():
            CenterArc((FILLET3_R, -FILLET3_R), FILLET3_R, 90, 90)
            Line((0, -FILLET3_R), (0, 0))
            Line((0, 0), (FILLET3_R, 0))
        make_face()
    extrude(amount=2.5, mode=Mode.SUBTRACT)
    with BuildSketch(Plane(origin=(48, 0, -0.5), x_dir=(0, 0, -1), z_dir=(0, -1, 0))) as fillet3_piece_11:
        with BuildLine():
            CenterArc((FILLET3_R, FILLET3_R), FILLET3_R, 180, 90)
            Line((0, FILLET3_R), (0, 0))
            Line((0, 0), (FILLET3_R, 0))
        make_face()
    extrude(amount=26.75, mode=Mode.SUBTRACT)
    with BuildSketch(Plane(origin=(28, 0, -14), x_dir=(1, 0, 0), z_dir=(0, 1, 0))) as fillet3_piece_12:
        with BuildLine():
            CenterArc((FILLET3_R, -FILLET3_R), FILLET3_R, 90, 90)
            Line((0, -FILLET3_R), (0, 0))
            Line((0, 0), (FILLET3_R, 0))
        make_face()
    extrude(amount=6.25, mode=Mode.SUBTRACT)
    with BuildSketch(Plane(origin=(48, -11.75, -14), x_dir=(-1, 0, 0), z_dir=(0, 1, 0))) as fillet3_piece_13:
        with BuildLine():
            CenterArc((FILLET3_R, FILLET3_R), FILLET3_R, 180, 90)
            Line((0, FILLET3_R), (0, 0))
            Line((0, 0), (FILLET3_R, 0))
        make_face()
    extrude(amount=18, mode=Mode.SUBTRACT)


solid = part.part
